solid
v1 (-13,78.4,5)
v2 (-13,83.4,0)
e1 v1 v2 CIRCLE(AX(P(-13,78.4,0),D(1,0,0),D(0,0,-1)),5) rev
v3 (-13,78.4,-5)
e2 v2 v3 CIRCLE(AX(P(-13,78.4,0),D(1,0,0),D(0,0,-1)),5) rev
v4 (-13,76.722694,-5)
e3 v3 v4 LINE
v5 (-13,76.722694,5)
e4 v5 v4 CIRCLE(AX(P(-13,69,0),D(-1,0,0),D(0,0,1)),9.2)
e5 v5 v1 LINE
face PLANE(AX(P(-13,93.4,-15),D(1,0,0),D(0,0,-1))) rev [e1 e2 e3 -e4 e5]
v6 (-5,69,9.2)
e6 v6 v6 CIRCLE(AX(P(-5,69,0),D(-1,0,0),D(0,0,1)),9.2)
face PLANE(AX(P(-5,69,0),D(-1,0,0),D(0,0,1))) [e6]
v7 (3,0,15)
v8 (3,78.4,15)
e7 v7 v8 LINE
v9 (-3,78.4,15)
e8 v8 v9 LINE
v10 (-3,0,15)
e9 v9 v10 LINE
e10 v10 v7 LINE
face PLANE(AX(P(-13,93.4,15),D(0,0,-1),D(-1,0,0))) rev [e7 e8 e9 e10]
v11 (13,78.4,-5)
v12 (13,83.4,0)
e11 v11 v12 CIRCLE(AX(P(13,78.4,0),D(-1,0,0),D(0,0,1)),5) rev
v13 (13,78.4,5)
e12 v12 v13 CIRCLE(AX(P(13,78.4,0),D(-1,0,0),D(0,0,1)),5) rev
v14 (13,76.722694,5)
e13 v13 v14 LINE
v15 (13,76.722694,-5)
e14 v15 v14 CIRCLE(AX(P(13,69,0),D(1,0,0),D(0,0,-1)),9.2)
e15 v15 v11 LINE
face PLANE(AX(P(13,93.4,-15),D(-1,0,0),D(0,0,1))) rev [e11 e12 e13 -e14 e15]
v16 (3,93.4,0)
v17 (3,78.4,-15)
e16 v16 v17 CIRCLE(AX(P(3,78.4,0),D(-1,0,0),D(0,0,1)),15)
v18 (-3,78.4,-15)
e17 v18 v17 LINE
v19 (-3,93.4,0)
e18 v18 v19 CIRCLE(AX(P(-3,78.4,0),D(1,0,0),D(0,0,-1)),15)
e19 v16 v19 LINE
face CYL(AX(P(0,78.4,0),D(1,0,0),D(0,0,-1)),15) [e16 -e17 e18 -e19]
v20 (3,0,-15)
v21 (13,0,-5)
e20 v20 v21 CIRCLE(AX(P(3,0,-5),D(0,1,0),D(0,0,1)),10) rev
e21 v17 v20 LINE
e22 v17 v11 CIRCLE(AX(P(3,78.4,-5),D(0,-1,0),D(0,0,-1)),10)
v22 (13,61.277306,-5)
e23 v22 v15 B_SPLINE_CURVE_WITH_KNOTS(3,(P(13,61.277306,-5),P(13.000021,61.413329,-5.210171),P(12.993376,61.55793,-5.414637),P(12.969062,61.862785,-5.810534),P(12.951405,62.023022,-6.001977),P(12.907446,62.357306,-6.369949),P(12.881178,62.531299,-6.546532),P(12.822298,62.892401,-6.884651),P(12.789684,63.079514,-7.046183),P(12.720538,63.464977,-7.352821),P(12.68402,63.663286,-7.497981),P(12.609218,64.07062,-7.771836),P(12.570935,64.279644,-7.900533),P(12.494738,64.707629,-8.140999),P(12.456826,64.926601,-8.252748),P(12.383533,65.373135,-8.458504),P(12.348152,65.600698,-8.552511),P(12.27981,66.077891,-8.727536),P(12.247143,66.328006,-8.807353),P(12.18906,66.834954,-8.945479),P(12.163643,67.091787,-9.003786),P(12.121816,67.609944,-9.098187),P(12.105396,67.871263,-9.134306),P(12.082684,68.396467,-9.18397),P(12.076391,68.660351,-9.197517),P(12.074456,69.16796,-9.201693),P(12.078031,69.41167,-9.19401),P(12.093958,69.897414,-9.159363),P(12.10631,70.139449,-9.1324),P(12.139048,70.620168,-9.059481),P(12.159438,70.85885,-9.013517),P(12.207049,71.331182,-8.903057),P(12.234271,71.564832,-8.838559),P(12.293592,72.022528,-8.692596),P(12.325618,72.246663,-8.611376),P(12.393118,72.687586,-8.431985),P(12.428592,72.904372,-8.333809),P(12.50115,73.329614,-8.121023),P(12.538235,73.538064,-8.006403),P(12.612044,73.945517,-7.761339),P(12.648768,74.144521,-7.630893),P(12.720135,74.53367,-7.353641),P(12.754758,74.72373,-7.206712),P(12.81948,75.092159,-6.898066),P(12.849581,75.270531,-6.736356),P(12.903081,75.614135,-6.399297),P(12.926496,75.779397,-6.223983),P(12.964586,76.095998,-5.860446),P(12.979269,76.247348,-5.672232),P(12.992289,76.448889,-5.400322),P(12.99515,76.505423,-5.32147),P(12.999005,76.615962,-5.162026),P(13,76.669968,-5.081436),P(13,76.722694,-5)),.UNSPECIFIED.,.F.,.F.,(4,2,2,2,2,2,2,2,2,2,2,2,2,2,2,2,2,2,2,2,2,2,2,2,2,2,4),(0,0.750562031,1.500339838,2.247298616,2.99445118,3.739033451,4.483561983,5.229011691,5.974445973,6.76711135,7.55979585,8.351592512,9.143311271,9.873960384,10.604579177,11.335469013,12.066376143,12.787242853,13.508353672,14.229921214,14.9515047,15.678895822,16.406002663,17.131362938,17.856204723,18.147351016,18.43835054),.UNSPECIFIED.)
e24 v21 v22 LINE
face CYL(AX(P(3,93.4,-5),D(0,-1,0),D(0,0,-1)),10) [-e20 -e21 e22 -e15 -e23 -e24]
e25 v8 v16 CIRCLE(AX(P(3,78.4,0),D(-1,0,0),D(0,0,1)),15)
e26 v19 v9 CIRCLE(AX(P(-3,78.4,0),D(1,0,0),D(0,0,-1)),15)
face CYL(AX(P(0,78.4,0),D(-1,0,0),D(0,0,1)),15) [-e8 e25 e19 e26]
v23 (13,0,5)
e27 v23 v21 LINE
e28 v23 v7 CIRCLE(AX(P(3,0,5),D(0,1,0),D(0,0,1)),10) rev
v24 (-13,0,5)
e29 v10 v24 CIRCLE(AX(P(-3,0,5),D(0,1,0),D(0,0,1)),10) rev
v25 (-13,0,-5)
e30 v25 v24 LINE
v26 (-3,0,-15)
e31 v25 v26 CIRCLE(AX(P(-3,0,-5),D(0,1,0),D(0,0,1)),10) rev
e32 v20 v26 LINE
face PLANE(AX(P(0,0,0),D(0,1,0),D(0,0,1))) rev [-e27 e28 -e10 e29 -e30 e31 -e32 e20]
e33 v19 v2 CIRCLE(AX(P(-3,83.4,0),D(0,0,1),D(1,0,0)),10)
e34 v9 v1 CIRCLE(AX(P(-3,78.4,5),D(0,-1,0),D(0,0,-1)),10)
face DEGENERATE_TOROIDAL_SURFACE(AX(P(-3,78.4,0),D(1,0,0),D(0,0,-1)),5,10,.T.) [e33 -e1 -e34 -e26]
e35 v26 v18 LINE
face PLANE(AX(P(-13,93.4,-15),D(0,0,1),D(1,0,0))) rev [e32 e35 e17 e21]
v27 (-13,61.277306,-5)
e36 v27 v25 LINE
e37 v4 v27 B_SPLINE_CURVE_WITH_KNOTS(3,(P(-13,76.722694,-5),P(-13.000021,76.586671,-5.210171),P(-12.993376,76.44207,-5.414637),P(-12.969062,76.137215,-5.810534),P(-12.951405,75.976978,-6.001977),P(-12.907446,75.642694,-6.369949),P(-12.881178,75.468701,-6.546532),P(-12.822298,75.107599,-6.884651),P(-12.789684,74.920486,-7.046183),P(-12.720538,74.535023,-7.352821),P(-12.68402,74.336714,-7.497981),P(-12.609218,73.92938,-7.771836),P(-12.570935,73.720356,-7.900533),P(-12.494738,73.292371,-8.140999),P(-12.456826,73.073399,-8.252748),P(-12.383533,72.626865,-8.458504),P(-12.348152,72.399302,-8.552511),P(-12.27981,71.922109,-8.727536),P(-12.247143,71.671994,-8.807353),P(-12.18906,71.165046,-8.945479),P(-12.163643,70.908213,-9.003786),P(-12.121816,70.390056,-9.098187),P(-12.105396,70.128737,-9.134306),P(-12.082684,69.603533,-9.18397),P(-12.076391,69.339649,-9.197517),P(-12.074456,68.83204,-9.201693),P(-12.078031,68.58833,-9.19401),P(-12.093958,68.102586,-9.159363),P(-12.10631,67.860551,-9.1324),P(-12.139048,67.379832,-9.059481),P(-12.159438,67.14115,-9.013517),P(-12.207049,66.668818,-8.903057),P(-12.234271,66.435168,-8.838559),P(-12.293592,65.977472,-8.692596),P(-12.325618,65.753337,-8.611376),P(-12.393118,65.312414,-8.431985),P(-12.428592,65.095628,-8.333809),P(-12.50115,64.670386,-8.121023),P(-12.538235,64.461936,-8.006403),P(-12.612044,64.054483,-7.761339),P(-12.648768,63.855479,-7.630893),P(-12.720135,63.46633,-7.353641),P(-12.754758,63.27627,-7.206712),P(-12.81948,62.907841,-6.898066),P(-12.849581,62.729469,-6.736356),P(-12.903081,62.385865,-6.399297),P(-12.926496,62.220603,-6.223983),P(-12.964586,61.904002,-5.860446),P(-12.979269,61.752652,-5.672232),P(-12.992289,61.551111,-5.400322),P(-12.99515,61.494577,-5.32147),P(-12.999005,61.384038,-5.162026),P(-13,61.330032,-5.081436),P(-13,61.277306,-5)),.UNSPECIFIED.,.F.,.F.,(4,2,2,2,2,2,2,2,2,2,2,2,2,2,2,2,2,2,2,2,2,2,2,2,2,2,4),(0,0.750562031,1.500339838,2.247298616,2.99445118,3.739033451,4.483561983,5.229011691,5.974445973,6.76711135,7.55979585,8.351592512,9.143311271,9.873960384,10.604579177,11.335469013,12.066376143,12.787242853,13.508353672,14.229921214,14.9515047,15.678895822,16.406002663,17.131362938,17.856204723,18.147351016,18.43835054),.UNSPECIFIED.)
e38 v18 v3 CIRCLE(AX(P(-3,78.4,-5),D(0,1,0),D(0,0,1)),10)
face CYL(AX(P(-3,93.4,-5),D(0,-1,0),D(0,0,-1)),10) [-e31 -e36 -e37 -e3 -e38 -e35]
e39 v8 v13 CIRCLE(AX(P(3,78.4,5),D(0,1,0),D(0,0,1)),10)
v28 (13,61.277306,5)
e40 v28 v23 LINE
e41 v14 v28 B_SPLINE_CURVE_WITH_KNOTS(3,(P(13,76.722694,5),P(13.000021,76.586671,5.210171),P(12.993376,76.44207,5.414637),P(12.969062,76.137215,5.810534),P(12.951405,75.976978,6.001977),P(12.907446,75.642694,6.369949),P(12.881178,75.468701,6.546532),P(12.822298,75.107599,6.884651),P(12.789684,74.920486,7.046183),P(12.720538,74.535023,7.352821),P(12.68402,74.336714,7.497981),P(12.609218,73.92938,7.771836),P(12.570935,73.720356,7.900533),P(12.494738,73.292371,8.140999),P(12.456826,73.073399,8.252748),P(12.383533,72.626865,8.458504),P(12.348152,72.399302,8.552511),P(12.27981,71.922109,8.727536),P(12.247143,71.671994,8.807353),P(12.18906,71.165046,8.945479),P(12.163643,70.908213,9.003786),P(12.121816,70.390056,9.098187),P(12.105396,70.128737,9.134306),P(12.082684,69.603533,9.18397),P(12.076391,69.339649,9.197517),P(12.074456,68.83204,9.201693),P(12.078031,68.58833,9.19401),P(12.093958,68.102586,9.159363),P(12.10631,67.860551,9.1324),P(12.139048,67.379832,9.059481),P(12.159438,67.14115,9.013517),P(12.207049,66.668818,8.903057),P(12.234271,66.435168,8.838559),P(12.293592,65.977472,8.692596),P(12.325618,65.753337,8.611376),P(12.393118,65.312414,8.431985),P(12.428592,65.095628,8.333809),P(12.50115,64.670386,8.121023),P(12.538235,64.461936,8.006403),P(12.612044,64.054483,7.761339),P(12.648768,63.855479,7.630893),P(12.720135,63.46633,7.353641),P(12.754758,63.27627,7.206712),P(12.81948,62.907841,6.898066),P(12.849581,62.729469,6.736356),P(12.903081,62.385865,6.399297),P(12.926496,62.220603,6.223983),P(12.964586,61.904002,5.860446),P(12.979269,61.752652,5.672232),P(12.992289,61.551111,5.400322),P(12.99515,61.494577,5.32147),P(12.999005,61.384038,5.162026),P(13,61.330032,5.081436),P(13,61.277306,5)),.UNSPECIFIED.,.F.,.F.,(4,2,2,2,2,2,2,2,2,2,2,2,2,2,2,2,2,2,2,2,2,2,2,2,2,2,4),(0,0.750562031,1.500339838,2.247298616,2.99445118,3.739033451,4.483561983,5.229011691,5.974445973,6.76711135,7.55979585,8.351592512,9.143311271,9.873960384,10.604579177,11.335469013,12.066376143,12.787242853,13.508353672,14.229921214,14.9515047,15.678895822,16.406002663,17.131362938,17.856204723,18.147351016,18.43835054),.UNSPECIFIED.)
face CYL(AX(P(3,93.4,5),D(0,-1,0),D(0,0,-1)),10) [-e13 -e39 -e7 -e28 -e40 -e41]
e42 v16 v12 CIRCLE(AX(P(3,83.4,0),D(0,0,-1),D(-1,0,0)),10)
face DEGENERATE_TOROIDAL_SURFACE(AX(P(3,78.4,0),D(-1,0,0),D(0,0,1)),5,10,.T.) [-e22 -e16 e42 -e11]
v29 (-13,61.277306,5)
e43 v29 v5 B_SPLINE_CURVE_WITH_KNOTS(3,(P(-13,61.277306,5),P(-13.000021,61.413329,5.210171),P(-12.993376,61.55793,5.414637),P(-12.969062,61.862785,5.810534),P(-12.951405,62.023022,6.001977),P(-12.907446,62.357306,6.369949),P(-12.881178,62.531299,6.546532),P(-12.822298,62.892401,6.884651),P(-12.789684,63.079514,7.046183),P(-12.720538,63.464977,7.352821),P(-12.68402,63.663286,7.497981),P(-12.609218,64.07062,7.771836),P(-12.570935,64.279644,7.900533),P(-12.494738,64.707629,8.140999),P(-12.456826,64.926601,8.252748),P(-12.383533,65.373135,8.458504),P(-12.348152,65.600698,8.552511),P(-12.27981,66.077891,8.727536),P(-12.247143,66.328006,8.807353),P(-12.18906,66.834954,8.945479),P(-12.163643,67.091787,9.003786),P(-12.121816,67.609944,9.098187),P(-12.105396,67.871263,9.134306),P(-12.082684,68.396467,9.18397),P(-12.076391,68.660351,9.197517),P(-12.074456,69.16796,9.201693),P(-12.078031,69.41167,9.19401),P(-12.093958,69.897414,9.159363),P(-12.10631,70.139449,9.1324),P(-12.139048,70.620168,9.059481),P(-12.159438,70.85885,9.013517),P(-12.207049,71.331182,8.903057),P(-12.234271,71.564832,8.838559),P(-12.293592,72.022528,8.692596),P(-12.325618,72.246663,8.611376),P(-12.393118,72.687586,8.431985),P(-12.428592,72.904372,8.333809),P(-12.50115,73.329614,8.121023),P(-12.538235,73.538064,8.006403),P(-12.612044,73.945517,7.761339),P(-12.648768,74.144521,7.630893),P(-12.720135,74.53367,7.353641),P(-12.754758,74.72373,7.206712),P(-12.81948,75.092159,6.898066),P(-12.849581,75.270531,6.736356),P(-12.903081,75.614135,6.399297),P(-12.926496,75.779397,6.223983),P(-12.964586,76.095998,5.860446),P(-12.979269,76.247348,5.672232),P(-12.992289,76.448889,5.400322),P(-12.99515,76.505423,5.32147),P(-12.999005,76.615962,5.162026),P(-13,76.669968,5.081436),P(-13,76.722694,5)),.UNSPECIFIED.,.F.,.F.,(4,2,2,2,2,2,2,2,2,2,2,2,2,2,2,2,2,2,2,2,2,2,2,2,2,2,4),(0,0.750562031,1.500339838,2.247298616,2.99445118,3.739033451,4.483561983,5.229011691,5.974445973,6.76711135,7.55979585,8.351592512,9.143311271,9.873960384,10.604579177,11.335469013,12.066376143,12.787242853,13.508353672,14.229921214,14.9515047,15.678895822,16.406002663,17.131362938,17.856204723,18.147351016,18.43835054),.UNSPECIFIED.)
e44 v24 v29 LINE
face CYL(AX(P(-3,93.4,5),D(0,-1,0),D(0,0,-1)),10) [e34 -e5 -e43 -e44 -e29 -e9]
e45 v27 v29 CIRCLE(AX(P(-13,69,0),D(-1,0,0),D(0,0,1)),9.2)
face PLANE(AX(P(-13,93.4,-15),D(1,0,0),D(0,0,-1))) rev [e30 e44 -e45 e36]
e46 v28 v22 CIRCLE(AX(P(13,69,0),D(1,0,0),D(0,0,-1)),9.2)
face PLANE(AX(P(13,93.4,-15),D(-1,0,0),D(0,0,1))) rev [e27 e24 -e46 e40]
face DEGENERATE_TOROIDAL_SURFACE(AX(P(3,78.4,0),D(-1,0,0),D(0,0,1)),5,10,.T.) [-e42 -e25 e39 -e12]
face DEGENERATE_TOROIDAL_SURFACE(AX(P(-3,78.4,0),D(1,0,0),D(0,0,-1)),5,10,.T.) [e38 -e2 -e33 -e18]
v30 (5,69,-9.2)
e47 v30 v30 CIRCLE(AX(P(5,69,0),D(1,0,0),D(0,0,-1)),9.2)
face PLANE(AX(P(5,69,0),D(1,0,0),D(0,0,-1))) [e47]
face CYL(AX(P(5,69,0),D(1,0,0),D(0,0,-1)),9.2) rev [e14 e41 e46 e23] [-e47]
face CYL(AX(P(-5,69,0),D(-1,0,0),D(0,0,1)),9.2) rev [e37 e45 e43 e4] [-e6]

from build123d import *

# Parameters (mm, degrees)
SKETCH2_W           = 26
SKETCH2_H           = 30
BOSS_EXTRUDE1_DEPTH = 93.4
SKETCH3_R           = 9.2
CUT_EXTRUDE1_DEPTH  = 8
CUT_EXTRUDE2_START  = -8
SKETCH4_R           = 9.2
CUT_EXTRUDE2_DEPTH  = 8
FILLET1_R           = 15
FILLET4_R           = 10
FILLET5_R           = 10


# Some blends are built 0.0001 mm under size
with BuildPart() as part:
    # Sketch2 → Boss-Extrude1 (new body)
    with BuildSketch(Plane(origin=(0, 0, 0), x_dir=(1, 0, 0), z_dir=(0, 1, 0))):
        Rectangle(SKETCH2_W, SKETCH2_H)
    extrude(amount=BOSS_EXTRUDE1_DEPTH)

    # Sketch3 → Cut-Extrude1 (cut)
    with BuildSketch(Plane(origin=(13, 0, 0), x_dir=(0, 0, -1), z_dir=(1, 0, 0))):
        with Locations((0, 69)):
            Circle(SKETCH3_R)
    extrude(amount=-CUT_EXTRUDE1_DEPTH, mode=Mode.SUBTRACT)

    # Sketch4 → Cut-Extrude2 (cut)
    with BuildSketch(Plane.ZY.offset(13).offset(CUT_EXTRUDE2_START)):
        with Locations(Location((0, 69, 0), (0, 0, 180))):
            Circle(SKETCH4_R)
    extrude(amount=CUT_EXTRUDE2_DEPTH, mode=Mode.SUBTRACT)

    # Fillet1
    fillet1_edges = [part.edges().sort_by_distance(p)[0] for p in [
        (0, 93.4, 15),
        (0, 93.4, -15),
    ]]
    fillet(fillet1_edges, radius=FILLET1_R - 0.0001)  # a hair under: the kernel refuses the full size

    # Fillet4
    # the kernel refuses this fillet: 10 mm, written as the material it takes off along each edge
    with BuildSketch(Plane(origin=(-13, -25, 15), x_dir=(0, 0, -1), z_dir=(0, 1, 0)), Plane(origin=(-13, -25, -15), x_dir=(1, 0, 0), z_dir=(0, 1, 0))) as fillet4_piece_1:
        with BuildLine():
            CenterArc((FILLET4_R, -FILLET4_R), FILLET4_R, 90, 90)
            Line((0, -FILLET4_R), (0, 0))
            Line((0, 0), (FILLET4_R, 0))
        make_face()
    extrude(amount=103.4001, mode=Mode.SUBTRACT)
    with BuildSketch(Plane(origin=(-13, 78.4001, -0.0001), x_dir=(0, 0, -1), z_dir=(0, -1, 0))) as fillet4_piece_2:
        with BuildLine():
            CenterArc((14.9999 - FILLET4_R, FILLET4_R), FILLET4_R, 270, 90)
            Line((14.9999, FILLET4_R), (14.9999, 0))
            Line((14.9999, 0), (14.9999 - FILLET4_R, 0))
        make_face()
    revolve(axis=Axis((-13, 78.4001, -0.0001), (1, 0, 0)), revolution_arc=90, mode=Mode.SUBTRACT)
    with BuildSketch(Plane(origin=(-13, 78.4001, 0.0001), x_dir=(0, 1, 0), z_dir=(0, 0, -1))) as fillet4_piece_3:
        with BuildLine():
            CenterArc((14.9999 - FILLET4_R, FILLET4_R), FILLET4_R, 270, 90)
            Line((14.9999, FILLET4_R), (14.9999, 0))
            Line((14.9999, 0), (14.9999 - FILLET4_R, 0))
        make_face()
    revolve(axis=Axis((-13, 78.4001, 0.0001), (1, 0, 0)), revolution_arc=90, mode=Mode.SUBTRACT)
    with BuildSketch(Plane(origin=(-13, 93.4, 0.0001), x_dir=(0, -1, 0), z_dir=(0, 0, -1))) as fillet4_piece_4:
        with BuildLine():
            CenterArc((FILLET4_R, -FILLET4_R), FILLET4_R, 90, 90)
            Line((0, -FILLET4_R), (0, 0))
            Line((0, 0), (FILLET4_R, 0))
        make_face()
    extrude(amount=0.0002, mode=Mode.SUBTRACT)

    # Fillet5
    # the kernel refuses this fillet: 10 mm, written as the material it takes off along each edge
    with BuildSketch(Plane(origin=(13, -25, -15), x_dir=(-1, 0, 0), z_dir=(0, 1, 0)), Plane(origin=(13, -25, 15), x_dir=(0, 0, -1), z_dir=(0, 1, 0))) as fillet5_piece_1:
        with BuildLine():
            CenterArc((FILLET5_R, FILLET5_R), FILLET5_R, 180, 90)
            Line((0, FILLET5_R), (0, 0))
            Line((0, 0), (FILLET5_R, 0))
        make_face()
    extrude(amount=103.4001, mode=Mode.SUBTRACT)
    with BuildSketch(Plane(origin=(13, 78.4001, -0.0001), x_dir=(0, 0, -1), z_dir=(0, -1, 0))) as fillet5_piece_2:
        with BuildLine():
            CenterArc((14.9999 - FILLET5_R, -FILLET5_R), FILLET5_R, 0, 90)
            Line((14.9999, -FILLET5_R), (14.9999, 0))
            Line((14.9999, 0), (14.9999 - FILLET5_R, 0))
        make_face()
    revolve(axis=Axis((13, 78.4001, -0.0001), (1, 0, 0)), revolution_arc=90, mode=Mode.SUBTRACT)
    with BuildSketch(Plane(origin=(13, 78.4001, 0.0001), x_dir=(0, 1, 0), z_dir=(0, 0, -1))) as fillet5_piece_3:
        with BuildLine():
            CenterArc((14.9999 - FILLET5_R, -FILLET5_R), FILLET5_R, 0, 90)
            Line((14.9999, -FILLET5_R), (14.9999, 0))
            Line((14.9999, 0), (14.9999 - FILLET5_R, 0))
        make_face()
    revolve(axis=Axis((13, 78.4001, 0.0001), (1, 0, 0)), revolution_arc=90, mode=Mode.SUBTRACT)
    with BuildSketch(Plane(origin=(13, 93.4, -0.0001), x_dir=(0, -1, 0), z_dir=(0, 0, 1))) as fillet5_piece_4:
        with BuildLine():
            CenterArc((FILLET5_R, -FILLET5_R), FILLET5_R, 90, 90)
            Line((0, -FILLET5_R), (0, 0))
            Line((0, 0), (FILLET5_R, 0))
        make_face()
    extrude(amount=0.0002, mode=Mode.SUBTRACT)


solid = part.part
